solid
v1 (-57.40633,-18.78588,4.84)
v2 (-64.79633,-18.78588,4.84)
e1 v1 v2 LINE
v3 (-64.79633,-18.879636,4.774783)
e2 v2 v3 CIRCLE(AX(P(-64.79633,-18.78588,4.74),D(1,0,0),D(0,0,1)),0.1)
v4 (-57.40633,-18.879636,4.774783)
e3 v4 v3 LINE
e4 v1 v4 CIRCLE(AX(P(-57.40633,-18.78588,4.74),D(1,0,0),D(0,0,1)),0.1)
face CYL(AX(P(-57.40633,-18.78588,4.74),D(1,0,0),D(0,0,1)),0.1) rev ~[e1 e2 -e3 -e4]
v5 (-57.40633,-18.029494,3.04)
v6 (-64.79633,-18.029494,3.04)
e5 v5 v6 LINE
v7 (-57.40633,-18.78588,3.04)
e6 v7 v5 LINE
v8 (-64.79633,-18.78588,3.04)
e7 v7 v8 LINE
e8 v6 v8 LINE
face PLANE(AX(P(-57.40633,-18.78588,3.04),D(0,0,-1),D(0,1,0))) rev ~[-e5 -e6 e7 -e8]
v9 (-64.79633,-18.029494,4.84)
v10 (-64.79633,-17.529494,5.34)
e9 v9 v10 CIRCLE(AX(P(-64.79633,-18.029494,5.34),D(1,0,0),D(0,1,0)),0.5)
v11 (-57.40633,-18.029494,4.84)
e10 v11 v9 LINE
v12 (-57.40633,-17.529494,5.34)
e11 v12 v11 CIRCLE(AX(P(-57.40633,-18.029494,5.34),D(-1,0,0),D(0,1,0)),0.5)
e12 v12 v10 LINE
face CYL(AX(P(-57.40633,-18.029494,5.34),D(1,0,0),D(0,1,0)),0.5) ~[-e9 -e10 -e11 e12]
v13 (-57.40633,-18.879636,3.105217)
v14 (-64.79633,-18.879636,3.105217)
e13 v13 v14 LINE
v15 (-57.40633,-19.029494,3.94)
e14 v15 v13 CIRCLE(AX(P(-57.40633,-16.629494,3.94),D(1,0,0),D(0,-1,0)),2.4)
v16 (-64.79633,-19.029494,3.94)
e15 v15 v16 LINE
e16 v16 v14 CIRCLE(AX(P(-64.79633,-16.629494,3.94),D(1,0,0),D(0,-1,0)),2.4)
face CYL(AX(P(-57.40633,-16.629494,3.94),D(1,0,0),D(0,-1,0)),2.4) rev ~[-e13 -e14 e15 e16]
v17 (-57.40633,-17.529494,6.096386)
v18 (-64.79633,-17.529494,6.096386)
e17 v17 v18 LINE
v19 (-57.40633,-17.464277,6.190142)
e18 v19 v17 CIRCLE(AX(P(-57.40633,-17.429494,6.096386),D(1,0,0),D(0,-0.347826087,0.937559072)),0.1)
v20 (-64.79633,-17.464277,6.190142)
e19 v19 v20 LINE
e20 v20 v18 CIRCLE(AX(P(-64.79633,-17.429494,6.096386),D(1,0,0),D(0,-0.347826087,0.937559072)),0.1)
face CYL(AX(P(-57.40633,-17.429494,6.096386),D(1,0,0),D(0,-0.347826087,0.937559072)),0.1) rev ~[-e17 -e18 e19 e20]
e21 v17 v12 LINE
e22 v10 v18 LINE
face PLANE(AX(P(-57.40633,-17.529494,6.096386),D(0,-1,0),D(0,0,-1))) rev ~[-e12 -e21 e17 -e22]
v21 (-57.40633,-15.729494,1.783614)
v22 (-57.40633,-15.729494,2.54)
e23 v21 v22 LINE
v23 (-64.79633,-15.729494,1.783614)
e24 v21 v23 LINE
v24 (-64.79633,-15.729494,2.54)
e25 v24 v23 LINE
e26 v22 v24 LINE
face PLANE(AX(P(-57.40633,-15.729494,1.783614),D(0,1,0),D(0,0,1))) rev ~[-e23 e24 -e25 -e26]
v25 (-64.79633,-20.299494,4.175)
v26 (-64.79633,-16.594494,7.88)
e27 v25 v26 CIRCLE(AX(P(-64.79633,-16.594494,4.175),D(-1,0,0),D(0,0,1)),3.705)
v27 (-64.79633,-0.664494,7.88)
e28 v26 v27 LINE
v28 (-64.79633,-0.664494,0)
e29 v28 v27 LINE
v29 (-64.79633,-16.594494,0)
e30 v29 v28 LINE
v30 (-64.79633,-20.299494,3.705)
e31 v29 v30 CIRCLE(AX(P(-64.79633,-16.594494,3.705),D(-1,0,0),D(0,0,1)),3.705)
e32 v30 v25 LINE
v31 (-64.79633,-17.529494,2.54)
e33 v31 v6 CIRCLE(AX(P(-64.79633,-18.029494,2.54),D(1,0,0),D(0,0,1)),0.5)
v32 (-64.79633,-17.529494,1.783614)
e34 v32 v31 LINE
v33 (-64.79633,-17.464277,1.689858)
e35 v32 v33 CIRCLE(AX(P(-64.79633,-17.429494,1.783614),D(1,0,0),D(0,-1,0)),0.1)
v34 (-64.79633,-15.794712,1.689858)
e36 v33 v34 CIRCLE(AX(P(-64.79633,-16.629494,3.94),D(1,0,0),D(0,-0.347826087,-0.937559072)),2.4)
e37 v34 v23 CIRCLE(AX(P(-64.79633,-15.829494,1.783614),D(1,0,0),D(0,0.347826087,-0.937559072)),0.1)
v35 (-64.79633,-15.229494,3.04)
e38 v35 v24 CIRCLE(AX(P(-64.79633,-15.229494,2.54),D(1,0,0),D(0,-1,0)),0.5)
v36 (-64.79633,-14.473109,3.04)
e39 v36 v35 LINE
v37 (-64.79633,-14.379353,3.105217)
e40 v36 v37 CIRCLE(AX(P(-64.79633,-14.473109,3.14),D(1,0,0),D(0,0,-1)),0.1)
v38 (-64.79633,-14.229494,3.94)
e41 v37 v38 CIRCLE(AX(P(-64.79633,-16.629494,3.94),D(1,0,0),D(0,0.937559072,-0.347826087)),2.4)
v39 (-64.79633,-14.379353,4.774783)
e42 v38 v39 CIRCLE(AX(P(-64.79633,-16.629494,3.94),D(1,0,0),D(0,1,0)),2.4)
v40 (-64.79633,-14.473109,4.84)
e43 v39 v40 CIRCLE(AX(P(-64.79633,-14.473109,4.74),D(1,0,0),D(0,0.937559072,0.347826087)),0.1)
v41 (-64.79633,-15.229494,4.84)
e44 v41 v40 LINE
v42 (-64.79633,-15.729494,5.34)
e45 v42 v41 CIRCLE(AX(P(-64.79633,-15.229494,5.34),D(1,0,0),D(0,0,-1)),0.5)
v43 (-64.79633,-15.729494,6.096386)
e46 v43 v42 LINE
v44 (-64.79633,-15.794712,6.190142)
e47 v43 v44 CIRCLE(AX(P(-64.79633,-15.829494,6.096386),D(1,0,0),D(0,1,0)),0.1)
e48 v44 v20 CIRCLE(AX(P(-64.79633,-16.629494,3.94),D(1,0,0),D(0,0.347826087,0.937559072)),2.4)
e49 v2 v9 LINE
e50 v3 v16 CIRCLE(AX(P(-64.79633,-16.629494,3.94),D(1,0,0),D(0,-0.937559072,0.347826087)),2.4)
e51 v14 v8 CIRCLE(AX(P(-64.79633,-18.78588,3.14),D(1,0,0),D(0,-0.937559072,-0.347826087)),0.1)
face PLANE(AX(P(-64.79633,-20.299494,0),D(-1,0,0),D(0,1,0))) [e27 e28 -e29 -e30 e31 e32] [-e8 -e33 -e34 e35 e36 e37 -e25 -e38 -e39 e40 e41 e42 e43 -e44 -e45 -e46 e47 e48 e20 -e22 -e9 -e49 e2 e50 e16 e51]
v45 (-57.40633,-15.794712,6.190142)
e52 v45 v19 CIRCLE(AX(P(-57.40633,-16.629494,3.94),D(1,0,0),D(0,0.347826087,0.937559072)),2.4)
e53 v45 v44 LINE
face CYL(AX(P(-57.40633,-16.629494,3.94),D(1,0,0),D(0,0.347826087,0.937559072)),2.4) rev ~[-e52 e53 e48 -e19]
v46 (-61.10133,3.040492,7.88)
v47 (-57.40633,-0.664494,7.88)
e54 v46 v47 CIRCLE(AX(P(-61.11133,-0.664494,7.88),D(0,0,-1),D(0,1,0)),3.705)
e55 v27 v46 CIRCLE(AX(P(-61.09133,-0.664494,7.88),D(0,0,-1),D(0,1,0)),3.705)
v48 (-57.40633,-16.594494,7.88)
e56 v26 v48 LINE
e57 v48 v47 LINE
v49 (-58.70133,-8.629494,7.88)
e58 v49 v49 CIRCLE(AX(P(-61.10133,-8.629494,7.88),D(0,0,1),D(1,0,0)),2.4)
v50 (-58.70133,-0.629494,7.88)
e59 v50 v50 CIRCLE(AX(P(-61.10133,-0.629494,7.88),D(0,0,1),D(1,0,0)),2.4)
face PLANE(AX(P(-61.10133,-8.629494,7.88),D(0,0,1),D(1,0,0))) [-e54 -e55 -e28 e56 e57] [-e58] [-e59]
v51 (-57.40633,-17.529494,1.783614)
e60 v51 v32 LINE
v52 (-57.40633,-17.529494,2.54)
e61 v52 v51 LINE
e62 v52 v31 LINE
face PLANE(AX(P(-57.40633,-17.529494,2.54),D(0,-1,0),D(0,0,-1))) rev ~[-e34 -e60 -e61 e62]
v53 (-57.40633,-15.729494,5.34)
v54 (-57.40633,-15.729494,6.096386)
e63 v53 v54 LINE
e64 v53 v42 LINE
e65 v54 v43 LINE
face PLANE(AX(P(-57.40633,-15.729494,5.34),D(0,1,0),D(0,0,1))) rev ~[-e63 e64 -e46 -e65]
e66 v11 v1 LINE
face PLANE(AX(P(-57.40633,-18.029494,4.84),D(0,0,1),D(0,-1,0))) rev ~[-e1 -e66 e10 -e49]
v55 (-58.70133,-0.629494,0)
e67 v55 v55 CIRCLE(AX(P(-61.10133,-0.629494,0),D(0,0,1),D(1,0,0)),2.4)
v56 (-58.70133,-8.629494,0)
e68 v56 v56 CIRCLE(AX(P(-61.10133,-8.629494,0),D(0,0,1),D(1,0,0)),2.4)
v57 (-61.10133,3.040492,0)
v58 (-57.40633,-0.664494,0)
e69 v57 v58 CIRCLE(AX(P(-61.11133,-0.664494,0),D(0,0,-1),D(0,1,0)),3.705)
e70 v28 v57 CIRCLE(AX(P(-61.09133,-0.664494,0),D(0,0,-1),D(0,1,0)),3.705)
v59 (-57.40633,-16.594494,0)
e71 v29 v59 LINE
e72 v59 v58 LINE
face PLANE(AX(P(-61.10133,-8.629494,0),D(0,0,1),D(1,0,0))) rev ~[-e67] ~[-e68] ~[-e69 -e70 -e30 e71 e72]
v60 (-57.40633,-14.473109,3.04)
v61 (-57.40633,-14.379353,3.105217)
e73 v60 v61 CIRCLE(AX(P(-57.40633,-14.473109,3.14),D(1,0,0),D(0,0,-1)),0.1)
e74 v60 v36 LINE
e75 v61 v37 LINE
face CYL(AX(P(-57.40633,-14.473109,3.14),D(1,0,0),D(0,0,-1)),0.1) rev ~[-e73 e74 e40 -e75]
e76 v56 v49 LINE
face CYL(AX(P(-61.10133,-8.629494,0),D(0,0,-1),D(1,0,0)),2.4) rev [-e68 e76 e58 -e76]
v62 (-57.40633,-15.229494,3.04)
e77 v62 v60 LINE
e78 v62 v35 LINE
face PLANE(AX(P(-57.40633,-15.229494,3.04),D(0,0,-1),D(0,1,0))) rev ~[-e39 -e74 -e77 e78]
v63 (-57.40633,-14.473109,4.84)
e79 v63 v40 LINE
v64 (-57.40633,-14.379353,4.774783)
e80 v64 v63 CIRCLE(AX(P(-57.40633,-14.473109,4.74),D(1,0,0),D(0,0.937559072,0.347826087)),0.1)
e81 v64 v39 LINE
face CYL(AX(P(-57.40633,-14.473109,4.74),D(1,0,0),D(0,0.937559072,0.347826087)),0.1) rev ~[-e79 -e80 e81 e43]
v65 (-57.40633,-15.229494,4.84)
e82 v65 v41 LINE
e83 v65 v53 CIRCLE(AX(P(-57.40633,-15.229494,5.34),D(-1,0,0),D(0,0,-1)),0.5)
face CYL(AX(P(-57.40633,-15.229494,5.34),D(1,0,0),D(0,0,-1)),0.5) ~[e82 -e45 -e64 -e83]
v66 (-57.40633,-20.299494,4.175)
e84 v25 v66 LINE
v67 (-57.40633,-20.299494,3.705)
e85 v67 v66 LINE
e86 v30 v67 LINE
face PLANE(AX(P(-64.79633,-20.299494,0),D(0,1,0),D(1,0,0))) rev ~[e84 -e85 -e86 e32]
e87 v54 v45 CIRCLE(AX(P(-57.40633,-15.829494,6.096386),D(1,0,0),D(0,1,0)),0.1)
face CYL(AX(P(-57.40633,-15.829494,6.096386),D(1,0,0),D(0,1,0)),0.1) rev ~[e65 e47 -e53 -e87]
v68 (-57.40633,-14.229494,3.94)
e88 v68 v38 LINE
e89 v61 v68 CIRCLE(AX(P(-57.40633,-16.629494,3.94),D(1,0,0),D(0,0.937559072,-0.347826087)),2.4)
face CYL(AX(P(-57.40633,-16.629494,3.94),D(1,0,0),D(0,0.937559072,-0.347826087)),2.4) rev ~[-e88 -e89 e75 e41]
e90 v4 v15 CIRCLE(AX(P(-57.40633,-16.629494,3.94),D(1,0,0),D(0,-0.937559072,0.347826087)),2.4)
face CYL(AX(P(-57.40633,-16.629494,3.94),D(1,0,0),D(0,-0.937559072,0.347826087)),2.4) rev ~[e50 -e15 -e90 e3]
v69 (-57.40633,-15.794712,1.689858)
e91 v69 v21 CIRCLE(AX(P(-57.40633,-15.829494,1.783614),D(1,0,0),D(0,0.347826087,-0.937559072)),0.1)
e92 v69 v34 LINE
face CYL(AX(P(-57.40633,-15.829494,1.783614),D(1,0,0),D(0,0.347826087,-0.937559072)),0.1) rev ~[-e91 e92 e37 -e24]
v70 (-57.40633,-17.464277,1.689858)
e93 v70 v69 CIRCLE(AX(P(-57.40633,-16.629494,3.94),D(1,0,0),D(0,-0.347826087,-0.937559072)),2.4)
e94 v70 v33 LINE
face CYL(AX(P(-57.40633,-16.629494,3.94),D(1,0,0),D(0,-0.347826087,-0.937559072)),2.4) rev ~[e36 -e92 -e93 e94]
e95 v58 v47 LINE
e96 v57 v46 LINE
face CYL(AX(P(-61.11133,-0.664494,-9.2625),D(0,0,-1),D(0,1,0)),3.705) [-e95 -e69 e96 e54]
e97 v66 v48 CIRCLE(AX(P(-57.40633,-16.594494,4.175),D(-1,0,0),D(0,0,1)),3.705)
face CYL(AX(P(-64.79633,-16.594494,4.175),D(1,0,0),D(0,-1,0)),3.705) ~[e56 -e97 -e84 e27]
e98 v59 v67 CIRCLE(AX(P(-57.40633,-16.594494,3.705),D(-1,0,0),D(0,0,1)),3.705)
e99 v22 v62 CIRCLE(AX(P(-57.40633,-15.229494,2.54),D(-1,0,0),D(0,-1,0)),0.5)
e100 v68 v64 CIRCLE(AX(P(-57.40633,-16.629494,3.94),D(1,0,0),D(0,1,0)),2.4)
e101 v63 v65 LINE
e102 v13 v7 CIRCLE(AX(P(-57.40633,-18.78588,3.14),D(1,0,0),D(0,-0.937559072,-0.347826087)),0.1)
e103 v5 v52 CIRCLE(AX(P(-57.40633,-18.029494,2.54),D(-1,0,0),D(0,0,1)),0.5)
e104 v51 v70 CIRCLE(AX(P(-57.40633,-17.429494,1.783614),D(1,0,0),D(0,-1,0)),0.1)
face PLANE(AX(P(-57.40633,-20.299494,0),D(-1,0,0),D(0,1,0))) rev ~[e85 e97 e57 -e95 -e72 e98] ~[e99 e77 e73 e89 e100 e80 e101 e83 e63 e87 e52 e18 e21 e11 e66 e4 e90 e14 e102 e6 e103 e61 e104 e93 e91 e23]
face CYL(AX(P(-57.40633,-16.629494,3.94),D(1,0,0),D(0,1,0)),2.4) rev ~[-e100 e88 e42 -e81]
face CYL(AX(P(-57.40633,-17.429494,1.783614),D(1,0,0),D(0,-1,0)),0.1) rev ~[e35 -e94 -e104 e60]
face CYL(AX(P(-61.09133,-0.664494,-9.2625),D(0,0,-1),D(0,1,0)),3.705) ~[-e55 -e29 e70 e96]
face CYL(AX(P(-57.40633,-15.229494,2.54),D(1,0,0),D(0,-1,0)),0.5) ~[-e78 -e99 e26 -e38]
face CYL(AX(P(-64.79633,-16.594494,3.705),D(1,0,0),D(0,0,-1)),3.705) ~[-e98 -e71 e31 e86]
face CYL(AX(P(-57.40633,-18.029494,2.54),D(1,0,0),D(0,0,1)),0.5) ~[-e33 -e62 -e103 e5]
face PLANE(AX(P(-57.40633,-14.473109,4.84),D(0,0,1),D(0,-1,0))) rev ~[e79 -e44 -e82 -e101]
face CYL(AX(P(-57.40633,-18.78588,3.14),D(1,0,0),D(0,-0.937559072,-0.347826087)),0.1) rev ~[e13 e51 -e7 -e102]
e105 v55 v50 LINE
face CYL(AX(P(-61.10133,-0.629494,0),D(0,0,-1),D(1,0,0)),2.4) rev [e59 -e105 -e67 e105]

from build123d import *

# Parameters (mm, degrees)
F0_W        = 7.39
F0_H        = 23.34
F0_R        = 2.4
F1_DEPTH    = 7.88
F2_T1_DEPTH = 26.405
F4_DEPTH    = 7.391
F5_R        = 3.705


# Not quite as in the source:
# - a fillet or chamfer that OpenCascade refuses, or shapes differently, is made with other operations: its cross-section is extruded or revolved along the edge and cut away or added


with BuildPart() as f1:
    # F0 (on Top) → F1 (new body)
    with BuildSketch(Plane.XY):
        with Locations((-61.1013304442, -8.6294944299)):
            Rectangle(F0_W, F0_H)
        with Locations((-61.1013304442, -8.6294944299)):
            Circle(F0_R, mode=Mode.SUBTRACT)
        with Locations((-61.1013304442, -0.6294944299)):
            Circle(F0_R, mode=Mode.SUBTRACT)
    extrude(amount=F1_DEPTH)

    # F2: fillet of radius 3.705 on 2 edges, made by hand

    # F2_s2 → F2_t1 (cut)
    with BuildSketch(Plane.XY.offset(-9.2625)):
        with BuildLine():
            ThreePointArc((-61.0913304442, 3.0405055701), (-63.7111610685, 1.9553361944), (-64.7963304442, -0.6644944299))
            Line((-64.7963304442, -0.6644944299), (-64.7963304442, 3.0405055701))
            Line((-64.7963304442, 3.0405055701), (-61.0913304442, 3.0405055701))
        make_face()
        with BuildLine():
            ThreePointArc((-61.1113304442, 3.0405055701), (-58.4914998199, 1.9553361944), (-57.4063304442, -0.6644944299))
            Line((-57.4063304442, -0.6644944299), (-57.4063304442, 3.0405055701))
            Line((-57.4063304442, 3.0405055701), (-61.1113304442, 3.0405055701))
        make_face()
    extrude(amount=F2_T1_DEPTH, mode=Mode.SUBTRACT)

    # F3 (on face) → F4 (cut, through all)
    with BuildSketch(Plane.YZ.offset(-57.4063304442)):
        with BuildLine():
            Line((-15.7294944299, 5.34), (-15.7294944299, 6.0963858653))
            ThreePointArc((-15.7294944299, 6.0963858653), (-15.747402223, 6.1534898894), (-15.7947118212, 6.1901417725))
            ThreePointArc((-15.7947118212, 6.1901417725), (-16.6294944299, 6.34), (-17.4642770386, 6.1901417725))
            ThreePointArc((-17.4642770386, 6.1901417725), (-17.5115866368, 6.1534898894), (-17.5294944299, 6.0963858653))
            Line((-17.5294944299, 6.0963858653), (-17.5294944299, 5.34))
            ThreePointArc((-17.5294944299, 5.34), (-17.6759410393, 4.9864466094), (-18.0294944299, 4.84))
            Line((-18.0294944299, 4.84), (-18.7858802952, 4.84))
            ThreePointArc((-18.7858802952, 4.84), (-18.8429843193, 4.8220922069), (-18.8796362024, 4.7747826087))
            ThreePointArc((-18.8796362024, 4.7747826087), (-18.9917328021, 4.3640635248), (-19.0294944299, 3.94))
            ThreePointArc((-19.0294944299, 3.94), (-18.9917328021, 3.5159364752), (-18.8796362024, 3.1052173913))
            ThreePointArc((-18.8796362024, 3.1052173913), (-18.8429843193, 3.0579077931), (-18.7858802952, 3.04))
            Line((-18.7858802952, 3.04), (-18.0294944299, 3.04))
            ThreePointArc((-18.0294944299, 3.04), (-17.6759410393, 2.8935533906), (-17.5294944299, 2.54))
            Line((-17.5294944299, 2.54), (-17.5294944299, 1.7836141347))
            ThreePointArc((-17.5294944299, 1.7836141347), (-17.5115866368, 1.7265101106), (-17.4642770386, 1.6898582275))
            ThreePointArc((-17.4642770386, 1.6898582275), (-16.6294944299, 1.54), (-15.7947118212, 1.6898582275))
            ThreePointArc((-15.7947118212, 1.6898582275), (-15.747402223, 1.7265101106), (-15.7294944299, 1.7836141347))
            Line((-15.7294944299, 1.7836141347), (-15.7294944299, 2.54))
            ThreePointArc((-15.7294944299, 2.54), (-15.5830478205, 2.8935533906), (-15.2294944299, 3.04))
            Line((-15.2294944299, 3.04), (-14.4731085646, 3.04))
            ThreePointArc((-14.4731085646, 3.04), (-14.4160045405, 3.0579077931), (-14.3793526574, 3.1052173913))
            ThreePointArc((-14.3793526574, 3.1052173913), (-14.2672560577, 3.5159364752), (-14.2294944299, 3.94))
            ThreePointArc((-14.2294944299, 3.94), (-14.2672560577, 4.3640635248), (-14.3793526574, 4.7747826087))
            ThreePointArc((-14.3793526574, 4.7747826087), (-14.4160045405, 4.8220922069), (-14.4731085646, 4.84))
            Line((-14.4731085646, 4.84), (-15.2294944299, 4.84))
            ThreePointArc((-15.2294944299, 4.84), (-15.5830478205, 4.9864466094), (-15.7294944299, 5.34))
        make_face()
    extrude(amount=-F4_DEPTH, mode=Mode.SUBTRACT)

    # F5
    f5_edges = [f1.edges().sort_by_distance(p)[0] for p in [
        (-61.10133, -20.299494, 7.88),
        (-61.10133, -20.299494, 0),
    ]]
    fillet(f5_edges, radius=F5_R)


solid = f1.part
